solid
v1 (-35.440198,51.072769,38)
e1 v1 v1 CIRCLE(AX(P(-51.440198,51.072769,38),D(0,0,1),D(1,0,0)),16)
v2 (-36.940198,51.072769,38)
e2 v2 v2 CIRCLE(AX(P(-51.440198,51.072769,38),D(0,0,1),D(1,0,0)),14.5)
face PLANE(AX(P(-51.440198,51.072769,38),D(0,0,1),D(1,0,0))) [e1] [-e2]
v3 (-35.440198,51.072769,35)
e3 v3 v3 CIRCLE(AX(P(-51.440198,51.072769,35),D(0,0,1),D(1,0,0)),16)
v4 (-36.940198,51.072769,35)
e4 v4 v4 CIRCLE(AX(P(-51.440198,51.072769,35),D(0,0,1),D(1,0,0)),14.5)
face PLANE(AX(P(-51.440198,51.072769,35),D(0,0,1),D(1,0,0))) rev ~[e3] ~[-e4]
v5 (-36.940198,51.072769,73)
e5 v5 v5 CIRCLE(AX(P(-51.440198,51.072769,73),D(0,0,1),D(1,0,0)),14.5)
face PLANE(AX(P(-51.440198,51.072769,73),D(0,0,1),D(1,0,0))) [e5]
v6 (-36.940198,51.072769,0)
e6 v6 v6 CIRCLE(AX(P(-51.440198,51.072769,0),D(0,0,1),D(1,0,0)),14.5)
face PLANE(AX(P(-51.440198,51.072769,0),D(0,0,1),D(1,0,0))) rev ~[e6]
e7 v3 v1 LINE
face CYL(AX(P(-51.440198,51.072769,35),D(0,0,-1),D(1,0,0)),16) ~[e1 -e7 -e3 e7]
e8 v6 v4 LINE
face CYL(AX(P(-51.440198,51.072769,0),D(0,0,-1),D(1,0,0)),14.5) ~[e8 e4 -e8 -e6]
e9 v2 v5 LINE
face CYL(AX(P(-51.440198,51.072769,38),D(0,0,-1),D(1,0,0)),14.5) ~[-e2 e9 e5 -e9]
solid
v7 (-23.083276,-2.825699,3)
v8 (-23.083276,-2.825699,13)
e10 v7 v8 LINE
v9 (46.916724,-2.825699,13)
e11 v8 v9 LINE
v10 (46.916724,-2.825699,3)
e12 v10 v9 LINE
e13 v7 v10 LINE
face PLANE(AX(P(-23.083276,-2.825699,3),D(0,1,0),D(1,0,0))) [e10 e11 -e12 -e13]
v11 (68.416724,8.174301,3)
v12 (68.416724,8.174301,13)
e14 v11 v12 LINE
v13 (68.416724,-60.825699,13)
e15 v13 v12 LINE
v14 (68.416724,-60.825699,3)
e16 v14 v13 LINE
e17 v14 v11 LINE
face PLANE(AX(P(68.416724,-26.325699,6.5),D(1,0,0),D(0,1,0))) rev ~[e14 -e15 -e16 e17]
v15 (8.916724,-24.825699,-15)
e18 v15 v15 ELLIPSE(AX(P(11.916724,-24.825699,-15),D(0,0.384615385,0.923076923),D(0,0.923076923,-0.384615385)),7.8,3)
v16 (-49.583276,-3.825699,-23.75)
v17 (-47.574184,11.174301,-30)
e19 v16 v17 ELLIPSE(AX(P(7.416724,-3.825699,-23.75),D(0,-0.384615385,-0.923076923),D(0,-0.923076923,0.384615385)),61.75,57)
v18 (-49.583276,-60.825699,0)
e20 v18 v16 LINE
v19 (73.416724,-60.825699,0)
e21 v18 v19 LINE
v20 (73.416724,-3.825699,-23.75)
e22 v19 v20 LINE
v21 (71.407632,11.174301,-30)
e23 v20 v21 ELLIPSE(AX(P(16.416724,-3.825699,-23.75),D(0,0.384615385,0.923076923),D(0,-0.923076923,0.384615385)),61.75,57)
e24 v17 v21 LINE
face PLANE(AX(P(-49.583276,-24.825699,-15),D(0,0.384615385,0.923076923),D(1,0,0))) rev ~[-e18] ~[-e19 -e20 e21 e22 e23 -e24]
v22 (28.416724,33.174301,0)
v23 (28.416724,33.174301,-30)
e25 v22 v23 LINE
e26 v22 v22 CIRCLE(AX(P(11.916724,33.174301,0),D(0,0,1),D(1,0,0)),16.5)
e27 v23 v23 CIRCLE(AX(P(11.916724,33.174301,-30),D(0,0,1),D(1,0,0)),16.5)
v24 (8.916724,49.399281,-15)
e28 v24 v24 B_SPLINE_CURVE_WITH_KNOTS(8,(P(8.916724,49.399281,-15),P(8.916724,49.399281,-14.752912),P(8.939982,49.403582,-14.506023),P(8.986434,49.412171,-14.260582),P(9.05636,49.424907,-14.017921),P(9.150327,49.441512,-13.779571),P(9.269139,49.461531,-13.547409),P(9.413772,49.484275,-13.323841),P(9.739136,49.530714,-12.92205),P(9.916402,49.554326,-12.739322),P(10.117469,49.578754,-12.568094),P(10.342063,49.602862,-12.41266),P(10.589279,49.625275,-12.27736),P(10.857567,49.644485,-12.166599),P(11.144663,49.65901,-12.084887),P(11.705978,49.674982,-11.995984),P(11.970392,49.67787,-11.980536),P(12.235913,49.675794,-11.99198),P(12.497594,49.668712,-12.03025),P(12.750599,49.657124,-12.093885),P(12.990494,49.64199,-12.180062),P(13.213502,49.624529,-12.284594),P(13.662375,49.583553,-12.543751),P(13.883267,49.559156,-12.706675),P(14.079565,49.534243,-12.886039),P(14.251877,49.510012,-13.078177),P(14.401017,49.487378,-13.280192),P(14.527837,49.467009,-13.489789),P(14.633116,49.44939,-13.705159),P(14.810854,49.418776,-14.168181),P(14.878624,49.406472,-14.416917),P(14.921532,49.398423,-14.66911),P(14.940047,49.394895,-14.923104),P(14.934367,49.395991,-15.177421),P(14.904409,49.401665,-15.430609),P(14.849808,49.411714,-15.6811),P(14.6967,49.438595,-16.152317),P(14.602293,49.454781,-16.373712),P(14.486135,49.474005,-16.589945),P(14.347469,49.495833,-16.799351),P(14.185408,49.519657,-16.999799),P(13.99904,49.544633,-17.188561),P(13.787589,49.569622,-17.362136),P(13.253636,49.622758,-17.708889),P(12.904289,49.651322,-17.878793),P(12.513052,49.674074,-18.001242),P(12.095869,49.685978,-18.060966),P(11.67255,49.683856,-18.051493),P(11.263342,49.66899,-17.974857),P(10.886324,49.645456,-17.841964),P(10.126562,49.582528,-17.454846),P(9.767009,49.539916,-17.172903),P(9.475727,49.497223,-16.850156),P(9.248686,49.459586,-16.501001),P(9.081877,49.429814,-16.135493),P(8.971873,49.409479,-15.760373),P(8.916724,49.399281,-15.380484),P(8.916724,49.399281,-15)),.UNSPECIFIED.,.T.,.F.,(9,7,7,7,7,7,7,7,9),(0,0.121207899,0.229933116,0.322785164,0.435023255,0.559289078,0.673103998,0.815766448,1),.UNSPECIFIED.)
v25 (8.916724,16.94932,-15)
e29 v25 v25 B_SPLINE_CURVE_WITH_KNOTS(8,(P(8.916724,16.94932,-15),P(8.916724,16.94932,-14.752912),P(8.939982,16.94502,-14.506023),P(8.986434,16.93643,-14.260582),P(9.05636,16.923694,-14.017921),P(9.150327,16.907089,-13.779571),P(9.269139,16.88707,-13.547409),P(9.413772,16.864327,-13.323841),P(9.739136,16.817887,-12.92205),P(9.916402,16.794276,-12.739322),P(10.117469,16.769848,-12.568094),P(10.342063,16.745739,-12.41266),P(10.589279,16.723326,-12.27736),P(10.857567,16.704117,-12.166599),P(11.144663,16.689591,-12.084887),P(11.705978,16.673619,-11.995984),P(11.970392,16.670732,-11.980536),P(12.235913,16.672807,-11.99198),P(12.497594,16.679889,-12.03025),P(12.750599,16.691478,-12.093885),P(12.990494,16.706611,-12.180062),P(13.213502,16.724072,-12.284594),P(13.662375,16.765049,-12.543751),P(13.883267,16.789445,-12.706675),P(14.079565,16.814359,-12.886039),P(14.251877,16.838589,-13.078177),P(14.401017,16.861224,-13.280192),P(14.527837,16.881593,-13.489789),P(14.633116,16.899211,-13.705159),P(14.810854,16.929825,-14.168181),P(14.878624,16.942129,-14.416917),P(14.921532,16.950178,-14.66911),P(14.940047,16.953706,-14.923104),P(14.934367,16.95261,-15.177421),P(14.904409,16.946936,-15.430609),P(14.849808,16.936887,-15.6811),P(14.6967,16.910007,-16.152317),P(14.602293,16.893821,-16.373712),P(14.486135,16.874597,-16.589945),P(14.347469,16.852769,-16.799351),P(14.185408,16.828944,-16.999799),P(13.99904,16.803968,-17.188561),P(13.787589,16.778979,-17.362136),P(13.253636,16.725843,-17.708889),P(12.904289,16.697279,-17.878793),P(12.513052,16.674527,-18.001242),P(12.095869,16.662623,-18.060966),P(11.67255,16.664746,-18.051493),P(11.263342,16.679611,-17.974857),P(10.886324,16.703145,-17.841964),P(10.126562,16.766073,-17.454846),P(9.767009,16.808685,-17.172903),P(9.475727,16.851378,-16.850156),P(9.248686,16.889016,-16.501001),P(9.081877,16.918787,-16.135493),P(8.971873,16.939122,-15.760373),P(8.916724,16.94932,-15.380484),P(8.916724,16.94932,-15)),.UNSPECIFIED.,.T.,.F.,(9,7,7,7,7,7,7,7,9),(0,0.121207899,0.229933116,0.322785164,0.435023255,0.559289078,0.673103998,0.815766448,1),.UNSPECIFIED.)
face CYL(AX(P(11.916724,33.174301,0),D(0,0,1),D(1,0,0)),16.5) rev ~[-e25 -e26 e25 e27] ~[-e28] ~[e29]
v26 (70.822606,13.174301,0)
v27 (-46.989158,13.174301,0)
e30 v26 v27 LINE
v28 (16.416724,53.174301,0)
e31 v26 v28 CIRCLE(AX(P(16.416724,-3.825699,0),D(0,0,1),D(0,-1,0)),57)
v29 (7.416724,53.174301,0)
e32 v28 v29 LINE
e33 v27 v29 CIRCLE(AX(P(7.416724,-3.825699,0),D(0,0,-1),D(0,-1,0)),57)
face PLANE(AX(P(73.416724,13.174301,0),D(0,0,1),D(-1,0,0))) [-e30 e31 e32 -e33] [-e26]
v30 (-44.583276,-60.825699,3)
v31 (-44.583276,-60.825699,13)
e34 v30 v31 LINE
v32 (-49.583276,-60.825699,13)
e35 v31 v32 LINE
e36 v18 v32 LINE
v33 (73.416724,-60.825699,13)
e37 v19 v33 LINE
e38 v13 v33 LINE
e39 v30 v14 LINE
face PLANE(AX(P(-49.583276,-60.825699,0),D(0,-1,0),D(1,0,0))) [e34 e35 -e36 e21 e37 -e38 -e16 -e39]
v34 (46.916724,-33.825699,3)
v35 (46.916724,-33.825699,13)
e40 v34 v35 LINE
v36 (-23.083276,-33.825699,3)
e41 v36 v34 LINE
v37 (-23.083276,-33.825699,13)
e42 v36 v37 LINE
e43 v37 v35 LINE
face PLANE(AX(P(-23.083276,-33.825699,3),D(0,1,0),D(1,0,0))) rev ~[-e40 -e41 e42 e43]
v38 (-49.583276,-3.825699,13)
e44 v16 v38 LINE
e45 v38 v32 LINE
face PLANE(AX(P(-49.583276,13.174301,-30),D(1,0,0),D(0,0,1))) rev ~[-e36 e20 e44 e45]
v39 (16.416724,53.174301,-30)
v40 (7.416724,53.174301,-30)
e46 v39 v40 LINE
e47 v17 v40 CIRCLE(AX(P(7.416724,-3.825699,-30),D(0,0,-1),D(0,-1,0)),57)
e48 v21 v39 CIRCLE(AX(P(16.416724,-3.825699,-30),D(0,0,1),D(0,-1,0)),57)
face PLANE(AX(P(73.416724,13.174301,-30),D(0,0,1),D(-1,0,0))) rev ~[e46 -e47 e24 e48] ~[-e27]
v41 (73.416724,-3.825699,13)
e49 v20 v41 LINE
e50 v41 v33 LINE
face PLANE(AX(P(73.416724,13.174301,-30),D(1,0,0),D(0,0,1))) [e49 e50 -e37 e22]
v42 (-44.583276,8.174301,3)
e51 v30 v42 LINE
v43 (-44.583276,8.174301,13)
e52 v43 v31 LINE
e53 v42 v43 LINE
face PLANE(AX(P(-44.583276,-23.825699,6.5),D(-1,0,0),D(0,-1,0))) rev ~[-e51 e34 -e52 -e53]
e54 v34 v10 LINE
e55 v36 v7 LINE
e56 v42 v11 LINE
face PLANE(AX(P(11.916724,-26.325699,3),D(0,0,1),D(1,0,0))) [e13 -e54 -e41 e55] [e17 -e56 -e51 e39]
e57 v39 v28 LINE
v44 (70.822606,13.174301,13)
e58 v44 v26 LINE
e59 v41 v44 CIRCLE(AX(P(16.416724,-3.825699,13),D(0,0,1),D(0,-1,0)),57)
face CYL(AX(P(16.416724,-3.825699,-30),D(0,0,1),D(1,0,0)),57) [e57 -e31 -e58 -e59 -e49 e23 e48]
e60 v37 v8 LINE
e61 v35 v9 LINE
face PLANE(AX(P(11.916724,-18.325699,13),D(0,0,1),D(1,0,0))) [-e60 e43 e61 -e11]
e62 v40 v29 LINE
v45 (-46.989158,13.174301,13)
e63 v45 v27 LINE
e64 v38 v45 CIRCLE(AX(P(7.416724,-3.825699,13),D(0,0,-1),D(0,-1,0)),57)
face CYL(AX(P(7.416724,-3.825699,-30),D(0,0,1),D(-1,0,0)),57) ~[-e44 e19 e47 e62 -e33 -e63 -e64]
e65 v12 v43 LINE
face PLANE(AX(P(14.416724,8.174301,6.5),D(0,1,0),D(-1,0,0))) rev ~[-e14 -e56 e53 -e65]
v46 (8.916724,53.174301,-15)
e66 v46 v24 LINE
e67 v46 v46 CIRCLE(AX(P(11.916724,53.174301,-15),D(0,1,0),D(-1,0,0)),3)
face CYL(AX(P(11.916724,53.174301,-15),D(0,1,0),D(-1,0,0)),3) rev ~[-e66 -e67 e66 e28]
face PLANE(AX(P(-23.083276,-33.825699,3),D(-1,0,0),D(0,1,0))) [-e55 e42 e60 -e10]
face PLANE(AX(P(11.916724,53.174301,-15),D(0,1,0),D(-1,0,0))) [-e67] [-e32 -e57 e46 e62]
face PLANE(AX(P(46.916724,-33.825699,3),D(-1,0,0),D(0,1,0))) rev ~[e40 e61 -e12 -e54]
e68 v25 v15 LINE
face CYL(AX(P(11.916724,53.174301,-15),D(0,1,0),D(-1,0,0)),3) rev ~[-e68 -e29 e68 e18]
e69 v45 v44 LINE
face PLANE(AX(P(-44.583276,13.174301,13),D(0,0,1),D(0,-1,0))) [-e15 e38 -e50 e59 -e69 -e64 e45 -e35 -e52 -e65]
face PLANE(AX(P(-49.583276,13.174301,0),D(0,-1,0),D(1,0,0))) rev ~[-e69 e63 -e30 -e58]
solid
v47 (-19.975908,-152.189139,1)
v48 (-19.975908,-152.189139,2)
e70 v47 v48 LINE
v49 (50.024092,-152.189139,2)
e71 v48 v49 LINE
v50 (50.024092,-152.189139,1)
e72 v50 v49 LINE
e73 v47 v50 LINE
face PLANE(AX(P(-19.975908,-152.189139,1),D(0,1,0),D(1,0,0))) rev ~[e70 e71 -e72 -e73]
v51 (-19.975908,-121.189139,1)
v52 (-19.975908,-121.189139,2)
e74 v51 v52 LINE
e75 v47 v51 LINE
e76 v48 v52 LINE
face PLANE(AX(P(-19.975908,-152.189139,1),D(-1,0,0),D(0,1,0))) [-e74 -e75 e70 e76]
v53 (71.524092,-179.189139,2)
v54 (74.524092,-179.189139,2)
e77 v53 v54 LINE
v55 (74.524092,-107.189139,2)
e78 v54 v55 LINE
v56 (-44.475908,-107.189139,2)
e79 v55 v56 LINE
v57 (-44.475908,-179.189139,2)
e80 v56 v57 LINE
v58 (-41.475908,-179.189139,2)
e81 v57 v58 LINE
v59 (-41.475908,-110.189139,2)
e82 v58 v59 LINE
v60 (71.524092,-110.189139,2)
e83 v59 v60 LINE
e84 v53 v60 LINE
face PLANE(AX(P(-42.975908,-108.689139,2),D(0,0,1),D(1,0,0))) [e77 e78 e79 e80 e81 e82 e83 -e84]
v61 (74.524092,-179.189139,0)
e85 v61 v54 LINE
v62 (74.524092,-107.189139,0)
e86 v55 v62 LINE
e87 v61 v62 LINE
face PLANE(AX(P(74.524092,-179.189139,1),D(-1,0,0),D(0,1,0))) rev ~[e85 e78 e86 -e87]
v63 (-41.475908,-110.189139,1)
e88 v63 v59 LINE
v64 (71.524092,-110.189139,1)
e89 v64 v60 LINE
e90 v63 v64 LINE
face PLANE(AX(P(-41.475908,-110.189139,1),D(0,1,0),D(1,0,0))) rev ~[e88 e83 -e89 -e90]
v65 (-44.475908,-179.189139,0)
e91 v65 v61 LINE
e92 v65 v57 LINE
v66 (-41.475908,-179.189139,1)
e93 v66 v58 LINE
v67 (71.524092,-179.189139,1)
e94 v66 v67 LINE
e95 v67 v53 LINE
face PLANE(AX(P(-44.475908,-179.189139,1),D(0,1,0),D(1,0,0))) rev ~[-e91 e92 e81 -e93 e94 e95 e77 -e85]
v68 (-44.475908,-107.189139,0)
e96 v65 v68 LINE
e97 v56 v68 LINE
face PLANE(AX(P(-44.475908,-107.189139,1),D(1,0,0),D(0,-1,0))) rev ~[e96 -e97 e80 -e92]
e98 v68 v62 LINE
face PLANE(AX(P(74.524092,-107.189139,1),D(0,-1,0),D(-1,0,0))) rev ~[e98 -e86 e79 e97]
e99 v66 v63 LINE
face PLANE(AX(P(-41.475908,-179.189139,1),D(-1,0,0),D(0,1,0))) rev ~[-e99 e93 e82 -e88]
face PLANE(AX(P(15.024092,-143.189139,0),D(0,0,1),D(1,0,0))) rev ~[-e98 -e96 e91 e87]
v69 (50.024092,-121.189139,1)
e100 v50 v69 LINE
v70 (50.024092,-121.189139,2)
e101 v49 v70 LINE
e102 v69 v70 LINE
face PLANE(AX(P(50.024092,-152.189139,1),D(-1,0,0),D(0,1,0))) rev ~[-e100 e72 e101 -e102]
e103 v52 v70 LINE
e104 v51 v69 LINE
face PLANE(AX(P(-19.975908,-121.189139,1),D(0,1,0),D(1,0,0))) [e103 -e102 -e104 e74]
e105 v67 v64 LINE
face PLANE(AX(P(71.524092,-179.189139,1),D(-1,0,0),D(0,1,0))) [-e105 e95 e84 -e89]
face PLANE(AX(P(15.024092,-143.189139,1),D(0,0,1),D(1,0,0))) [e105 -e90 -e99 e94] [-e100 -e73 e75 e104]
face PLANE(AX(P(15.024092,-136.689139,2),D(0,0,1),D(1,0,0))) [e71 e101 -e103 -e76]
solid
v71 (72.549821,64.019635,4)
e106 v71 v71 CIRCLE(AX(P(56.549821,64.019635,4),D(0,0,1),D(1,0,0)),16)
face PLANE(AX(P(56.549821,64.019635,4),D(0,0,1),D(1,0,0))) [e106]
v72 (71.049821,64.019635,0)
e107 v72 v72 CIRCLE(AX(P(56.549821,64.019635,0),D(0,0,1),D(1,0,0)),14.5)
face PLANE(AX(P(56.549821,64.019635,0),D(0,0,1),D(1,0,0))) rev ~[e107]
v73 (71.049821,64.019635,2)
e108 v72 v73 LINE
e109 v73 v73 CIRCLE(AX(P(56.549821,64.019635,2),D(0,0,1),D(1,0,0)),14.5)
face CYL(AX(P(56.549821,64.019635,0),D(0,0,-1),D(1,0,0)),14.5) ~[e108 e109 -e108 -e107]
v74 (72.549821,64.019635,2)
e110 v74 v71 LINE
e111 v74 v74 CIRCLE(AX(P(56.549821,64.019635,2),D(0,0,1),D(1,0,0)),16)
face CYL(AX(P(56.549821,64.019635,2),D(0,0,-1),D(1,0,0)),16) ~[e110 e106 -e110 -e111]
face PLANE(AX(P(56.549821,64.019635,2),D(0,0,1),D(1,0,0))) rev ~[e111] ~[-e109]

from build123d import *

# Parameters (mm, degrees)
F0_R      = 14.5
F1_DEPTH  = 35
F2_R      = 16
F3_DEPTH  = 3
F4_R      = 14.5
F5_DEPTH  = 35
F6_W      = 113
F6_H      = 69
F7_DEPTH  = 3
F8_W      = 70
F8_H      = 31
F9_DEPTH  = 10
F10_W     = 69
F10_H     = 13
F11_DEPTH = 5
F12_W     = 118
F12_H     = 13
F13_DEPTH = 5
F14_W     = 74
F14_H     = 13
F15_DEPTH = 5
F16_W     = 123
F16_H     = 74
F17_DEPTH = 30
F18_W     = 123
F18_H     = 30
F19_DEPTH = 40
F20_R     = 16.5
F21_DEPTH = 30.001
F22_SIZE2 = 72
F22_SIZE  = 30
F23_R     = 57
F24_R     = 57
F25_R     = 3
F26_DEPTH = 114.001
F27_R     = 14.5
F28_DEPTH = 2
F29_R     = 16
F30_DEPTH = 2
F31_W     = 119
F31_H     = 72
F32_DEPTH = 1
F33_W     = 3
F33_H     = 3
F33_W_2   = 113
F33_H_2   = 69
F34_DEPTH = 1
F35_W     = 70
F35_H     = 31
F36_DEPTH = 1


with BuildPart() as f1:
    # F0 (on Top) → F1 (new body)
    with BuildSketch(Plane.XY):
        with Locations((-51.4401979744, 51.072768867)):
            Circle(F0_R)
    extrude(amount=F1_DEPTH)

    # F2 (on face) → F3 (join)
    with BuildSketch(Plane.XY.offset(35)):
        with Locations((-51.4401979744, 51.072768867)):
            Circle(F2_R)
    extrude(amount=F3_DEPTH)

    # F4 (on face) → F5 (join)
    with BuildSketch(Plane.XY.offset(38)):
        with Locations((-51.4401979744, 51.072768867)):
            Circle(F4_R)
    extrude(amount=F5_DEPTH)


with BuildPart() as f7:
    # F6 (on Top) → F7 (new body)
    with BuildSketch(Plane.XY):
        with Locations((11.9167239517, -26.3256993649)):
            Rectangle(F6_W, F6_H)
    extrude(amount=F7_DEPTH)

    # F8 (on face) → F9 (join)
    with BuildSketch(Plane.XY.offset(3)):
        with Locations((11.9167239517, -18.3256993649)):
            Rectangle(F8_W, F8_H)
    extrude(amount=F9_DEPTH)

    # F10 (on face) → F11 (join)
    with BuildSketch(Plane.YZ.offset(68.4167239517)):
        with Locations((-26.3256993649, 6.5)):
            Rectangle(F10_W, F10_H)
    extrude(amount=F11_DEPTH)

    # F12 (on face) → F13 (join)
    with BuildSketch(Plane(origin=(0, 8.1743006351, 0), x_dir=(-1, 0, 0), z_dir=(0, 1, 0))):
        with Locations((-14.4167239517, 6.5)):
            Rectangle(F12_W, F12_H)
    extrude(amount=F13_DEPTH)

    # F14 (on face) → F15 (join)
    with BuildSketch(Plane(origin=(-44.5832760483, 0, 0), x_dir=(0, -1, 0), z_dir=(-1, 0, 0))):
        with Locations((23.8256993649, 6.5)):
            Rectangle(F14_W, F14_H)
    extrude(amount=F15_DEPTH)

    # F16 (on face) → F17 (join)
    with BuildSketch(Plane(origin=(0, 0, 0), x_dir=(1, 0, 0), z_dir=(0, 0, -1))):
        with Locations((11.9167239517, 23.8256993649)):
            Rectangle(F16_W, F16_H)
    extrude(amount=F17_DEPTH)

    # F18 (on face) → F19 (join)
    with BuildSketch(Plane(origin=(0, 13.1743006351, 0), x_dir=(-1, 0, 0), z_dir=(0, 1, 0))):
        with Locations((-11.9167239517, -15)):
            Rectangle(F18_W, F18_H)
    extrude(amount=F19_DEPTH)

    # F20 (on face) → F21 (cut, through all)
    with BuildSketch(Plane.XY):
        with Locations((11.9167239517, 33.1743006351)):
            Circle(F20_R)
    extrude(amount=-F21_DEPTH, mode=Mode.SUBTRACT)

    # F22
    f22_edges = [f7.edges().sort_by_distance(p)[0] for p in [
        (11.916724, -60.825699, -30),
    ]]
    chamfer(f22_edges, length=F22_SIZE, length2=F22_SIZE2)

    # F23
    f23_edges = [f7.edges().sort_by_distance(p)[0] for p in [
        (73.416724, 53.174301, -15),
    ]]
    fillet(f23_edges, radius=F23_R)

    # F24
    f24_edges = [f7.edges().sort_by_distance(p)[0] for p in [
        (-49.583276, 53.174301, -15),
    ]]
    fillet(f24_edges, radius=F24_R)

    # F25 (on face) → F26 (cut, through all)
    with BuildSketch(Plane(origin=(0, 53.1743006351, 0), x_dir=(-1, 0, 0), z_dir=(0, 1, 0))):
        with Locations((-11.9167239517, -15)):
            Circle(F25_R)
    extrude(amount=-F26_DEPTH, mode=Mode.SUBTRACT)


with BuildPart() as f28:
    # F27 (on Top) → F28 (new body)
    with BuildSketch(Plane.XY):
        with Locations((56.549821049, 64.0196353197)):
            Circle(F27_R)
    extrude(amount=F28_DEPTH)

    # F29 (on face) → F30 (join)
    with BuildSketch(Plane.XY.offset(2)):
        with Locations((56.549821049, 64.0196353197)):
            Circle(F29_R)
    extrude(amount=F30_DEPTH)


with BuildPart() as f32:
    # F31 (on Top) → F32 (new body)
    with BuildSketch(Plane.XY):
        with Locations((15.024092472, -143.1891386509)):
            Rectangle(F31_W, F31_H)
    extrude(amount=F32_DEPTH)

    # F33 (on face) → F34 (join)
    with BuildSketch(Plane.XY.offset(1)):
        with Locations((-42.975907528, -108.6891386509)):
            Rectangle(F33_W, F33_H)
        with Locations((15.024092472, -108.6891386509)):
            Rectangle(F33_W_2, F33_H)
        with Locations((-42.975907528, -144.6891386509)):
            Rectangle(F33_W, F33_H_2)
        with Locations((73.024092472, -108.6891386509)):
            Rectangle(F33_W, F33_H)
        with Locations((73.024092472, -144.6891386509)):
            Rectangle(F33_W, F33_H_2)
    extrude(amount=F34_DEPTH)

    # F35 (on face) → F36 (join)
    with BuildSketch(Plane.XY.offset(1)):
        with Locations((15.024092472, -136.6891386509)):
            Rectangle(F35_W, F35_H)
    extrude(amount=F36_DEPTH)


solid = Compound([f1.part, f7.part, f28.part, f32.part])
